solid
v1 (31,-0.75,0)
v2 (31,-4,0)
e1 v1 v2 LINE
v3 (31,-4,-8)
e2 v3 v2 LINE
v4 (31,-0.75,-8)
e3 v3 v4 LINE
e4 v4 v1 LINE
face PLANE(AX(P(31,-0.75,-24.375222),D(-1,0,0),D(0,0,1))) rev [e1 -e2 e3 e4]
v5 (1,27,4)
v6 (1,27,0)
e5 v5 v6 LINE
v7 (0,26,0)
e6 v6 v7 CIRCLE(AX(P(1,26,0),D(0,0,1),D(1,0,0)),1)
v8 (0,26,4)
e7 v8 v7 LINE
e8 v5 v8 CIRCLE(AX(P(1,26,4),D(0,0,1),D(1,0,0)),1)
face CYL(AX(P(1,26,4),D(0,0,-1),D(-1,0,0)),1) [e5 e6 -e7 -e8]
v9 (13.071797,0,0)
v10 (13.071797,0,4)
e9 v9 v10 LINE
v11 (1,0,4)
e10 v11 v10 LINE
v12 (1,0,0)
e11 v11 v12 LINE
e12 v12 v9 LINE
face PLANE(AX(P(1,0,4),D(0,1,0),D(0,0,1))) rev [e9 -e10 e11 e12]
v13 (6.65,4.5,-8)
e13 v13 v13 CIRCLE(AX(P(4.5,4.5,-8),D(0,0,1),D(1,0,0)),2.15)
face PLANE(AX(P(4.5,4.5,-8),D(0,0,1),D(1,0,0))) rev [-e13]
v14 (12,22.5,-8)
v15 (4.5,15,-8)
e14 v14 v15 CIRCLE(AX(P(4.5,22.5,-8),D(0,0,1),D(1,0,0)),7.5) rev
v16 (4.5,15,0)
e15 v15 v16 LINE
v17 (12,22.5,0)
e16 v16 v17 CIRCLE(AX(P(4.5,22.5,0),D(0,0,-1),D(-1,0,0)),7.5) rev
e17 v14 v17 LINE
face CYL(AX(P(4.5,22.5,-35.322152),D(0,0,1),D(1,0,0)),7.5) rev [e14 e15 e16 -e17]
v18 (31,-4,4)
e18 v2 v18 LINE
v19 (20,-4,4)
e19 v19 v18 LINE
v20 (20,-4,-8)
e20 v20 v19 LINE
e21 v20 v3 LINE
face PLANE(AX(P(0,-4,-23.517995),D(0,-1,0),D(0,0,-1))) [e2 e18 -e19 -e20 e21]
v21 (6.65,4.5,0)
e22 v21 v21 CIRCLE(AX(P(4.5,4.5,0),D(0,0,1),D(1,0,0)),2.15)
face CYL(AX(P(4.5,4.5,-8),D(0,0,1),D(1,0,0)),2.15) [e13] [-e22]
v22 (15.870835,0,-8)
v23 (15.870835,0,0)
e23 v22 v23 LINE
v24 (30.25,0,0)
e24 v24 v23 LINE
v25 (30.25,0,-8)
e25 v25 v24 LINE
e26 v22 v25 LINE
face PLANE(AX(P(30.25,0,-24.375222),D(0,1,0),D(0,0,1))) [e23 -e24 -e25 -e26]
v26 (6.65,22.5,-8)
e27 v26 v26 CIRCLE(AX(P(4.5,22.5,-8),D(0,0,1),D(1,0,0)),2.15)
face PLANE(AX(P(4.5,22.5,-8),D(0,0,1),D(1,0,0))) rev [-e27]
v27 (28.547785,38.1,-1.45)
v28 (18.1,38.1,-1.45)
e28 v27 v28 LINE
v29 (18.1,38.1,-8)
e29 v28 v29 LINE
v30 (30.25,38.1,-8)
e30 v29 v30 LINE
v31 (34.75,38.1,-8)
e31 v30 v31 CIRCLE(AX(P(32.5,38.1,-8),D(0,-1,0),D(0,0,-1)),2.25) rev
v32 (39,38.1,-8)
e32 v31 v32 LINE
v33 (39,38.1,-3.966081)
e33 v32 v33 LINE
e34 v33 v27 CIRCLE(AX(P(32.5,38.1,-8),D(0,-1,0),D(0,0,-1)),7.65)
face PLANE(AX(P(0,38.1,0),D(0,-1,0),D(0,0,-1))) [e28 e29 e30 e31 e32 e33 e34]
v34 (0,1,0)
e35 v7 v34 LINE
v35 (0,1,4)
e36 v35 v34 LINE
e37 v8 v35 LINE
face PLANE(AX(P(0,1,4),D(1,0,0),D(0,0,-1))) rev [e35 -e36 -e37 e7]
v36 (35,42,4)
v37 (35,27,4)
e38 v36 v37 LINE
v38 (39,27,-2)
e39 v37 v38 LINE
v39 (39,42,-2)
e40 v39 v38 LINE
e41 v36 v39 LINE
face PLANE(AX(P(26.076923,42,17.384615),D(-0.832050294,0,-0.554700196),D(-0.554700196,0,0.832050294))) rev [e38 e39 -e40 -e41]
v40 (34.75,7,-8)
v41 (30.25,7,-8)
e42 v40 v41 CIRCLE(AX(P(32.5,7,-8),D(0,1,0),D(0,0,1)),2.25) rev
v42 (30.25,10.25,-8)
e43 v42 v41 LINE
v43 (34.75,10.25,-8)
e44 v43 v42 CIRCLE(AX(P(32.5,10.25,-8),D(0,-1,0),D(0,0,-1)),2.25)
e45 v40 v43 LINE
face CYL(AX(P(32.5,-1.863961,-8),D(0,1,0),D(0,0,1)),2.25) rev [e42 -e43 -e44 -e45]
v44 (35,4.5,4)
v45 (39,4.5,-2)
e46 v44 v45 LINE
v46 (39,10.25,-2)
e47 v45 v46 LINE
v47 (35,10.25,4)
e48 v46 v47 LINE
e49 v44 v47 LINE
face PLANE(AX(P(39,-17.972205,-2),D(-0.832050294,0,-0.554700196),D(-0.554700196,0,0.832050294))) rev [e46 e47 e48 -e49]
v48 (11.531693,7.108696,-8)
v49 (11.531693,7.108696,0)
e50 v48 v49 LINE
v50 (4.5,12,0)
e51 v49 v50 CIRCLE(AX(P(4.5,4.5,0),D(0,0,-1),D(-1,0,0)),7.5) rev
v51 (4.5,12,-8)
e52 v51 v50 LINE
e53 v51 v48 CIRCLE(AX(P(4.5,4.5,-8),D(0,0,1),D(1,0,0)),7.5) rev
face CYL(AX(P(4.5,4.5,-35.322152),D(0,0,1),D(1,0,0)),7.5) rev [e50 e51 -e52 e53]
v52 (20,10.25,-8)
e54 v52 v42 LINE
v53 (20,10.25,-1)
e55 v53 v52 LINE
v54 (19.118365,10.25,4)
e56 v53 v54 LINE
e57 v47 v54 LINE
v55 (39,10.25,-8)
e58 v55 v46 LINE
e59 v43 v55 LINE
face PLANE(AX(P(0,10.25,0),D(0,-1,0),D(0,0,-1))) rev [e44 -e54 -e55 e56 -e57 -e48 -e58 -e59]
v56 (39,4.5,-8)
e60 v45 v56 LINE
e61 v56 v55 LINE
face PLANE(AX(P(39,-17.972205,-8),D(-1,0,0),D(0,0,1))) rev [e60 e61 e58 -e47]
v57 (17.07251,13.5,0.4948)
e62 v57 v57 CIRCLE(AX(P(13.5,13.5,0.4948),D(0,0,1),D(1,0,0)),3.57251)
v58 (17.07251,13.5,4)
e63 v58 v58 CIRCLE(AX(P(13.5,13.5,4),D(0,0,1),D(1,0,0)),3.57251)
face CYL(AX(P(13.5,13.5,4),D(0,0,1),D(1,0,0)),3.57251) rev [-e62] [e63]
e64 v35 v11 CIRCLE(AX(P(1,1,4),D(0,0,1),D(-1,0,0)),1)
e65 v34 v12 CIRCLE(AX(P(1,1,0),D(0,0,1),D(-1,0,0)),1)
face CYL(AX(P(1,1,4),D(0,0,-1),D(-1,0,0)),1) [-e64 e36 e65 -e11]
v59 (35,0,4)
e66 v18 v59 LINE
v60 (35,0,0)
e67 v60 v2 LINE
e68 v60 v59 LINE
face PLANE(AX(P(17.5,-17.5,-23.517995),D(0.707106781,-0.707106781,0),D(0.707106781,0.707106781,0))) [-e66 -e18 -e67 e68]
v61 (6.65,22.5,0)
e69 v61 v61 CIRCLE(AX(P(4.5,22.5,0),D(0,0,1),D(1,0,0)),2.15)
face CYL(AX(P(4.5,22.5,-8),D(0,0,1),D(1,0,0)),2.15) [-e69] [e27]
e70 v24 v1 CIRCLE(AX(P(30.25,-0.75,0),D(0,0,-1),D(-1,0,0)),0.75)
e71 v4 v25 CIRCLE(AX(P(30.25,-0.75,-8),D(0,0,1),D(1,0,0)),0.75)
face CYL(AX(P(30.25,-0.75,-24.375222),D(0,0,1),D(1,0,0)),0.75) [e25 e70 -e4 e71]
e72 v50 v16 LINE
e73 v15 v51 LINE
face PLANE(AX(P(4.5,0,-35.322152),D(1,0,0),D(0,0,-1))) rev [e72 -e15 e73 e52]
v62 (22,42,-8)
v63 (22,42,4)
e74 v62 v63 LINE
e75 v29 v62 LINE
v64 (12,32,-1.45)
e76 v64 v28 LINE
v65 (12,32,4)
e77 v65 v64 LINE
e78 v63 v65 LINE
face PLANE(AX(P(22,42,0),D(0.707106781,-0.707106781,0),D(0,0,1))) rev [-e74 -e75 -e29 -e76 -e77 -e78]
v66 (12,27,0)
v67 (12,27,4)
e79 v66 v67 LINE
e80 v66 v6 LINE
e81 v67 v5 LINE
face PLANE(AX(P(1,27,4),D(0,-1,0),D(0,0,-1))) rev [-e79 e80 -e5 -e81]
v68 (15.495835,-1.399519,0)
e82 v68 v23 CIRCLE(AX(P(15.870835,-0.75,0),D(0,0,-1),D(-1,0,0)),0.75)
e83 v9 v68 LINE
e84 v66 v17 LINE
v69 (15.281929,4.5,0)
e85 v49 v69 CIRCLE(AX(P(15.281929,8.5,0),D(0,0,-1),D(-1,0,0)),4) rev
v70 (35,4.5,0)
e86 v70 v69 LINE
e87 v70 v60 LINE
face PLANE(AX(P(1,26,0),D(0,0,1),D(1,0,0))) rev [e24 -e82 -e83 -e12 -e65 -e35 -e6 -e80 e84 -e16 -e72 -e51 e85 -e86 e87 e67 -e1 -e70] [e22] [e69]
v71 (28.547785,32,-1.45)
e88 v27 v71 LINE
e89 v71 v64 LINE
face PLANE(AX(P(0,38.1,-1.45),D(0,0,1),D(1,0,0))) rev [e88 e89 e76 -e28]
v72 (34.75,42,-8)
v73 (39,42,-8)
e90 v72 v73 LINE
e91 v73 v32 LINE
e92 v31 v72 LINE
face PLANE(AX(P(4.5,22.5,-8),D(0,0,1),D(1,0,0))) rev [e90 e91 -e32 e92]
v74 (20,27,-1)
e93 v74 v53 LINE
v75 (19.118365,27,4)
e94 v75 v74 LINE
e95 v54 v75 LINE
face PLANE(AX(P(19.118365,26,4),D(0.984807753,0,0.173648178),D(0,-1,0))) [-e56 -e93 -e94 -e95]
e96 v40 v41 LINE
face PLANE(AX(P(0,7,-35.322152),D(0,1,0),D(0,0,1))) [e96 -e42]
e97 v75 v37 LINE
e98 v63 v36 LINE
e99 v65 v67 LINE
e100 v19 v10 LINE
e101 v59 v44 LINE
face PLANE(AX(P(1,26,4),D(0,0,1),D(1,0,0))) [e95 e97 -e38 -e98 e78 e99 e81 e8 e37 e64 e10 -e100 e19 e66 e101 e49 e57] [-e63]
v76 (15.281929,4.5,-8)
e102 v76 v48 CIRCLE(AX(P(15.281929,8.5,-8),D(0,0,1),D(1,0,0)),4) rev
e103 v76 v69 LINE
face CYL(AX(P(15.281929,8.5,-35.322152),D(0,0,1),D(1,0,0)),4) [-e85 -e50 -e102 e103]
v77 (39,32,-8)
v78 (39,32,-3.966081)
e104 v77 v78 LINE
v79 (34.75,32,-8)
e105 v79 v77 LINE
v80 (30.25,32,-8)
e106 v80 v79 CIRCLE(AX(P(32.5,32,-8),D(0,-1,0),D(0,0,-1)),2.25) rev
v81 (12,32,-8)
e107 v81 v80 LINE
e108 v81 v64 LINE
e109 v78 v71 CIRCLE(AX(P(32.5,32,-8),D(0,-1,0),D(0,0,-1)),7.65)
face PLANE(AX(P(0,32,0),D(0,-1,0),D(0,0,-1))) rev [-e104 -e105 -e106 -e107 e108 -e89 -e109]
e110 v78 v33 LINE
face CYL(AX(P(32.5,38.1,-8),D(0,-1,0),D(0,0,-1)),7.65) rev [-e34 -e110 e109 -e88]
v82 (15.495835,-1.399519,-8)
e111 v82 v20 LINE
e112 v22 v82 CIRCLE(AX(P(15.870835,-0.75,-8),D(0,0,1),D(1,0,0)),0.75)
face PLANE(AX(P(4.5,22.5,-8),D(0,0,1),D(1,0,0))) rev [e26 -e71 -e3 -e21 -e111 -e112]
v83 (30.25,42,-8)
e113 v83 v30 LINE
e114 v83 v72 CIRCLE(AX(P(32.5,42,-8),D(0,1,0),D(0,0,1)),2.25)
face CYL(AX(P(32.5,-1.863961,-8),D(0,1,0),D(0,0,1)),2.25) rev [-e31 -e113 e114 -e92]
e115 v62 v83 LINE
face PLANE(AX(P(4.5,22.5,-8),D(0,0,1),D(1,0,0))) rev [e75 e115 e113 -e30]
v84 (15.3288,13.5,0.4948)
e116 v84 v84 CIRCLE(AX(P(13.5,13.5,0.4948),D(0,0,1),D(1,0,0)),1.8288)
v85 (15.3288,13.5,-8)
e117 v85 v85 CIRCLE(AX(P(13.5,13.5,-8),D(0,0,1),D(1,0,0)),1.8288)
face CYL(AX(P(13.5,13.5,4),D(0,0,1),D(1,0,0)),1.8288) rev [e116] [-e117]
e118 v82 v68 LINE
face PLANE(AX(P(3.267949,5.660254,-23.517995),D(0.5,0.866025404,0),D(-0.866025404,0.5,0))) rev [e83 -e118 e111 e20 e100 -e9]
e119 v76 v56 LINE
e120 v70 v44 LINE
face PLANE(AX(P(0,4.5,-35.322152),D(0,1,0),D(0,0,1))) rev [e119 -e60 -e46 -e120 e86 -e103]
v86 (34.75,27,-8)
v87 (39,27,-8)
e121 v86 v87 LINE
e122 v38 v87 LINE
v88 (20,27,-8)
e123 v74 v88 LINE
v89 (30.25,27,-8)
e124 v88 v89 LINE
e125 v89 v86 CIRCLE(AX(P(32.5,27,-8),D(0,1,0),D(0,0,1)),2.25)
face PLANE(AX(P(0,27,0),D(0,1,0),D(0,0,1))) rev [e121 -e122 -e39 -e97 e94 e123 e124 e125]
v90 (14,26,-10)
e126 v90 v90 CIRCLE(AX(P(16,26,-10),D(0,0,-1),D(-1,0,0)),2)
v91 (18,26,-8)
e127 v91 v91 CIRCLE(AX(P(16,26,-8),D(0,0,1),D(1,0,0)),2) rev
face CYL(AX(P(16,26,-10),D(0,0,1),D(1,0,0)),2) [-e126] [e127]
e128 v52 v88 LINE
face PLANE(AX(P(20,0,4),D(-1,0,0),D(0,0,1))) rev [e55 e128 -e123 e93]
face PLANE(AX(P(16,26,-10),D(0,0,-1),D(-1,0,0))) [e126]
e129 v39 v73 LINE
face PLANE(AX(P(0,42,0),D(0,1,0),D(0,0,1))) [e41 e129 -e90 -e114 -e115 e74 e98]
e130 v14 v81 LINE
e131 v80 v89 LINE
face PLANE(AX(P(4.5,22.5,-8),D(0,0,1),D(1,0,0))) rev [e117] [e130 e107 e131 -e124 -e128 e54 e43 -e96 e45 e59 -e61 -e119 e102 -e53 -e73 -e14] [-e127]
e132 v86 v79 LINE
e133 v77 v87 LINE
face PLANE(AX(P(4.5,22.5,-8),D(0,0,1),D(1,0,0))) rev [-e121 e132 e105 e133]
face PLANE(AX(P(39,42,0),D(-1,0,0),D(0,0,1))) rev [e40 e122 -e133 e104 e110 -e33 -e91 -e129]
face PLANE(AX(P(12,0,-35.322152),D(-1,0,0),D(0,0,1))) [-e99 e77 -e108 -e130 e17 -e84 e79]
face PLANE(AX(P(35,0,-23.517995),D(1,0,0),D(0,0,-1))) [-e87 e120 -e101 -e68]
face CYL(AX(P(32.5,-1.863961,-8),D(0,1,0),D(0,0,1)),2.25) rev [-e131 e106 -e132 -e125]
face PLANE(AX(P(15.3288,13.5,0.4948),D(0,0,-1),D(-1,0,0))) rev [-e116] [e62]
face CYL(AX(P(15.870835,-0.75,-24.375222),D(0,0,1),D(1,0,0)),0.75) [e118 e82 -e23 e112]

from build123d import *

# Parameters (mm, degrees)
BOSS_EXTRUDE1_DEPTH                            = 4
SKETCH3_R                                      = 2.15
BOSS_EXTRUDE2_DEPTH                            = 8
BOSS_EXTRUDE3_START                            = -8
BOSS_EXTRUDE3_DEPTH                            = 8
CBORE_FOR_6_SOCKET_HEAD_CAP_SCREW1_D           = 3.6576
CBORE_FOR_6_SOCKET_HEAD_CAP_SCREW1_CBORE_D     = 7.14502
CBORE_FOR_6_SOCKET_HEAD_CAP_SCREW1_CBORE_DEPTH = 3.5052
BOSS_EXTRUDE5_DEPTH                            = 15
BOSS_EXTRUDE6_DEPTH                            = 5.75
CUT_EXTRUDE1_DEPTH                             = 49.104053883
CUT_EXTRUDE1_DEPTH_BACK                        = 20
SKETCH11_5_R                                   = 2.25
CUT_EXTRUDE2_DEPTH                             = 6.1
CHAMFER2_SIZE                                  = 10
SKETCH18_R                                     = 2
BOSS_EXTRUDE10_DEPTH                           = 2
CHAMFER3_SIZE                                  = 5
CHAMFER3_SIZE2                                 = 0.881634904
BOSS_EXTRUDE7_DEPTH                            = 4
BOSS_EXTRUDE9_DEPTH                            = 8


with BuildPart() as part:
    # Sketch2 → Boss-Extrude1 (new body)
    with BuildSketch(Plane.XY):
        with BuildLine():
            Line((1, 0), (20, 0))
            Line((20, 0), (20, 27))
            Line((20, 27), (1, 27))
            ThreePointArc((1, 27), (0.292893219, 26.707106781), (0, 26))
            Line((0, 26), (0, 1))
            ThreePointArc((0, 1), (0.292893219, 0.292893219), (1, 0))
        make_face()
    extrude(amount=BOSS_EXTRUDE1_DEPTH)

    # Sketch3 → Boss-Extrude2 (add)
    with BuildSketch(Plane.XY):
        with Locations((4.5, 22.5)):
            Circle(SKETCH3_R)
        with Locations((4.5, 4.5)):
            Circle(SKETCH3_R)
    extrude(amount=-BOSS_EXTRUDE2_DEPTH)

    # Sketch3<3> → Boss-Extrude3 (add)
    with BuildSketch(Plane.XY.offset(BOSS_EXTRUDE3_START)):
        with BuildLine():
            Line((4.5, 15), (4.5, 12))
            ThreePointArc((4.5, 12), (8.782801805, 10.656915518), (11.531693039, 7.108695652))
            ThreePointArc((11.531693039, 7.108695652), (12.997768364, 5.216311724), (15.281929326, 4.5))
            Line((15.281929326, 4.5), (20, 4.5))
            Line((20, 4.5), (20, 27))
            Line((20, 27), (12, 27))
            Line((12, 27), (12, 22.5))
            ThreePointArc((12, 22.5), (9.803300859, 17.196699141), (4.5, 15))
        make_face()
    extrude(amount=BOSS_EXTRUDE3_DEPTH)

    # CBORE for #6 Socket Head Cap Screw1 (through all)
    with Locations(Plane.XY.offset(4)):
        with Locations((13.5, 13.5)):
            CounterBoreHole(CBORE_FOR_6_SOCKET_HEAD_CAP_SCREW1_D / 2, CBORE_FOR_6_SOCKET_HEAD_CAP_SCREW1_CBORE_D / 2, CBORE_FOR_6_SOCKET_HEAD_CAP_SCREW1_CBORE_DEPTH)

    # Sketch11 → Boss-Extrude5 (add)
    with BuildSketch(Plane(origin=(0, 27, 0), x_dir=(1, 0, 0), z_dir=(0, 1, 0))):
        Polygon((12, 8), (12, -4), (35, -4), (39, 2), (39, 8), align=None)
    extrude(amount=BOSS_EXTRUDE5_DEPTH)

    # Sketch13 → Boss-Extrude6 (add)
    with BuildSketch(Plane(origin=(0, 10.25, 0), x_dir=(-1, 0, 0), z_dir=(0, -1, 0))):
        Polygon((-20, -4), (-20, 8), (-39, 8), (-39, 2), (-35, -4), align=None)
    extrude(amount=BOSS_EXTRUDE6_DEPTH)

    # Sketch11<5> → Cut-Extrude1 (cut, two sides: drawn at the far end of the back side and taken through both)
    with BuildSketch(Plane(origin=(0, 27, 0), x_dir=(1, 0, 0), z_dir=(0, 1, 0)).offset(-CUT_EXTRUDE1_DEPTH_BACK)):
        with Locations((32.5, 8)):
            Circle(SKETCH11_5_R)
    extrude(amount=CUT_EXTRUDE1_DEPTH + CUT_EXTRUDE1_DEPTH_BACK, mode=Mode.SUBTRACT)

    # Sketch14 → Cut-Extrude2 (cut)
    with BuildSketch(Plane(origin=(0, 32, 0), x_dir=(-1, 0, 0), z_dir=(0, -1, 0))):
        with BuildLine():
            Line((-29.85, 14.55), (-29.85, 1.45))
            Line((-29.85, 1.45), (-28.547785431, 1.45))
            ThreePointArc((-28.547785431, 1.45), (-25.8382832, 4.239145141), (-24.85, 8))
            ThreePointArc((-24.85, 8), (-25.8382832, 11.760854859), (-28.547785431, 14.55))
            Line((-28.547785431, 14.55), (-29.85, 14.55))
        make_face()
        with BuildLine():
            Line((-28.547785431, 1.45), (-29.85, 1.45))
            Line((-29.85, 1.45), (-29.85, 14.55))
            Line((-29.85, 14.55), (-28.547785431, 14.55))
            ThreePointArc((-28.547785431, 14.55), (-40.15, 8), (-28.547785431, 1.45))
        make_face()
        with BuildLine():
            ThreePointArc((-24.85, 8), (-25.8382832, 4.239145141), (-28.547785431, 1.45))
            Line((-28.547785431, 1.45), (-24.85, 1.45))
            Line((-24.85, 1.45), (-24.85, 8))
        make_face()
        Polygon((-24.85, 8), (-24.85, 1.45), (-9.85, 1.45), (-9.85, 14.55), (-24.85, 14.55), align=None)
        with BuildLine():
            Line((-24.85, 14.55), (-28.547785431, 14.55))
            ThreePointArc((-28.547785431, 14.55), (-25.8382832, 11.760854859), (-24.85, 8))
            Line((-24.85, 8), (-24.85, 14.55))
        make_face()
    extrude(amount=-CUT_EXTRUDE2_DEPTH, mode=Mode.SUBTRACT)

    # Chamfer2
    chamfer2_edges = [part.edges().sort_by_distance(p)[0] for p in [
        (12, 42, -2),
    ]]
    chamfer(chamfer2_edges, length=CHAMFER2_SIZE)

    # Sketch18 → Boss-Extrude10 (add)
    with BuildSketch(Plane(origin=(0, 0, -8), x_dir=(-1, 0, 0), z_dir=(0, 0, -1))):
        with Locations(Location((-16, 26, 0), (0, 0, 180))):
            Circle(SKETCH18_R)
    extrude(amount=BOSS_EXTRUDE10_DEPTH)

    # Chamfer3
    chamfer3_edges = [part.edges().sort_by_distance(p)[0] for p in [
        (20, 18.625, 4),
    ]]
    chamfer3_side = [part.faces().sort_by_distance(p)[0] for p in [
        (20, 18.625, -2),
    ]]
    chamfer(chamfer3_edges, length=CHAMFER3_SIZE, length2=CHAMFER3_SIZE2, reference=chamfer3_side[0])

    # Sketch15 → Boss-Extrude7 (add)
    with BuildSketch(Plane.XY.offset(4)):
        Polygon((20, 4.5), (20, 0), (13.07179677, 0), (20, -4), (31, -4), (35, 0), (35, 4.5), align=None)
    extrude(amount=-BOSS_EXTRUDE7_DEPTH)

    # Sketch17 → Boss-Extrude9 (add)
    with BuildSketch(Plane(origin=(0, 0, 0), x_dir=(-1, 0, 0), z_dir=(0, 0, -1))):
        with BuildLine():
            Line((-30.25, 0), (-15.870834875, 0))
            ThreePointArc((-15.870834875, 0), (-15.146390506, -0.555885716), (-15.495834875, -1.399519053))
            Line((-15.495834875, -1.399519053), (-20, -4))
            Line((-20, -4), (-31, -4))
            Line((-31, -4), (-31, -0.75))
            ThreePointArc((-31, -0.75), (-30.780330086, -0.219669914), (-30.25, 0))
        make_face()
    extrude(amount=BOSS_EXTRUDE9_DEPTH)


solid = part.part
